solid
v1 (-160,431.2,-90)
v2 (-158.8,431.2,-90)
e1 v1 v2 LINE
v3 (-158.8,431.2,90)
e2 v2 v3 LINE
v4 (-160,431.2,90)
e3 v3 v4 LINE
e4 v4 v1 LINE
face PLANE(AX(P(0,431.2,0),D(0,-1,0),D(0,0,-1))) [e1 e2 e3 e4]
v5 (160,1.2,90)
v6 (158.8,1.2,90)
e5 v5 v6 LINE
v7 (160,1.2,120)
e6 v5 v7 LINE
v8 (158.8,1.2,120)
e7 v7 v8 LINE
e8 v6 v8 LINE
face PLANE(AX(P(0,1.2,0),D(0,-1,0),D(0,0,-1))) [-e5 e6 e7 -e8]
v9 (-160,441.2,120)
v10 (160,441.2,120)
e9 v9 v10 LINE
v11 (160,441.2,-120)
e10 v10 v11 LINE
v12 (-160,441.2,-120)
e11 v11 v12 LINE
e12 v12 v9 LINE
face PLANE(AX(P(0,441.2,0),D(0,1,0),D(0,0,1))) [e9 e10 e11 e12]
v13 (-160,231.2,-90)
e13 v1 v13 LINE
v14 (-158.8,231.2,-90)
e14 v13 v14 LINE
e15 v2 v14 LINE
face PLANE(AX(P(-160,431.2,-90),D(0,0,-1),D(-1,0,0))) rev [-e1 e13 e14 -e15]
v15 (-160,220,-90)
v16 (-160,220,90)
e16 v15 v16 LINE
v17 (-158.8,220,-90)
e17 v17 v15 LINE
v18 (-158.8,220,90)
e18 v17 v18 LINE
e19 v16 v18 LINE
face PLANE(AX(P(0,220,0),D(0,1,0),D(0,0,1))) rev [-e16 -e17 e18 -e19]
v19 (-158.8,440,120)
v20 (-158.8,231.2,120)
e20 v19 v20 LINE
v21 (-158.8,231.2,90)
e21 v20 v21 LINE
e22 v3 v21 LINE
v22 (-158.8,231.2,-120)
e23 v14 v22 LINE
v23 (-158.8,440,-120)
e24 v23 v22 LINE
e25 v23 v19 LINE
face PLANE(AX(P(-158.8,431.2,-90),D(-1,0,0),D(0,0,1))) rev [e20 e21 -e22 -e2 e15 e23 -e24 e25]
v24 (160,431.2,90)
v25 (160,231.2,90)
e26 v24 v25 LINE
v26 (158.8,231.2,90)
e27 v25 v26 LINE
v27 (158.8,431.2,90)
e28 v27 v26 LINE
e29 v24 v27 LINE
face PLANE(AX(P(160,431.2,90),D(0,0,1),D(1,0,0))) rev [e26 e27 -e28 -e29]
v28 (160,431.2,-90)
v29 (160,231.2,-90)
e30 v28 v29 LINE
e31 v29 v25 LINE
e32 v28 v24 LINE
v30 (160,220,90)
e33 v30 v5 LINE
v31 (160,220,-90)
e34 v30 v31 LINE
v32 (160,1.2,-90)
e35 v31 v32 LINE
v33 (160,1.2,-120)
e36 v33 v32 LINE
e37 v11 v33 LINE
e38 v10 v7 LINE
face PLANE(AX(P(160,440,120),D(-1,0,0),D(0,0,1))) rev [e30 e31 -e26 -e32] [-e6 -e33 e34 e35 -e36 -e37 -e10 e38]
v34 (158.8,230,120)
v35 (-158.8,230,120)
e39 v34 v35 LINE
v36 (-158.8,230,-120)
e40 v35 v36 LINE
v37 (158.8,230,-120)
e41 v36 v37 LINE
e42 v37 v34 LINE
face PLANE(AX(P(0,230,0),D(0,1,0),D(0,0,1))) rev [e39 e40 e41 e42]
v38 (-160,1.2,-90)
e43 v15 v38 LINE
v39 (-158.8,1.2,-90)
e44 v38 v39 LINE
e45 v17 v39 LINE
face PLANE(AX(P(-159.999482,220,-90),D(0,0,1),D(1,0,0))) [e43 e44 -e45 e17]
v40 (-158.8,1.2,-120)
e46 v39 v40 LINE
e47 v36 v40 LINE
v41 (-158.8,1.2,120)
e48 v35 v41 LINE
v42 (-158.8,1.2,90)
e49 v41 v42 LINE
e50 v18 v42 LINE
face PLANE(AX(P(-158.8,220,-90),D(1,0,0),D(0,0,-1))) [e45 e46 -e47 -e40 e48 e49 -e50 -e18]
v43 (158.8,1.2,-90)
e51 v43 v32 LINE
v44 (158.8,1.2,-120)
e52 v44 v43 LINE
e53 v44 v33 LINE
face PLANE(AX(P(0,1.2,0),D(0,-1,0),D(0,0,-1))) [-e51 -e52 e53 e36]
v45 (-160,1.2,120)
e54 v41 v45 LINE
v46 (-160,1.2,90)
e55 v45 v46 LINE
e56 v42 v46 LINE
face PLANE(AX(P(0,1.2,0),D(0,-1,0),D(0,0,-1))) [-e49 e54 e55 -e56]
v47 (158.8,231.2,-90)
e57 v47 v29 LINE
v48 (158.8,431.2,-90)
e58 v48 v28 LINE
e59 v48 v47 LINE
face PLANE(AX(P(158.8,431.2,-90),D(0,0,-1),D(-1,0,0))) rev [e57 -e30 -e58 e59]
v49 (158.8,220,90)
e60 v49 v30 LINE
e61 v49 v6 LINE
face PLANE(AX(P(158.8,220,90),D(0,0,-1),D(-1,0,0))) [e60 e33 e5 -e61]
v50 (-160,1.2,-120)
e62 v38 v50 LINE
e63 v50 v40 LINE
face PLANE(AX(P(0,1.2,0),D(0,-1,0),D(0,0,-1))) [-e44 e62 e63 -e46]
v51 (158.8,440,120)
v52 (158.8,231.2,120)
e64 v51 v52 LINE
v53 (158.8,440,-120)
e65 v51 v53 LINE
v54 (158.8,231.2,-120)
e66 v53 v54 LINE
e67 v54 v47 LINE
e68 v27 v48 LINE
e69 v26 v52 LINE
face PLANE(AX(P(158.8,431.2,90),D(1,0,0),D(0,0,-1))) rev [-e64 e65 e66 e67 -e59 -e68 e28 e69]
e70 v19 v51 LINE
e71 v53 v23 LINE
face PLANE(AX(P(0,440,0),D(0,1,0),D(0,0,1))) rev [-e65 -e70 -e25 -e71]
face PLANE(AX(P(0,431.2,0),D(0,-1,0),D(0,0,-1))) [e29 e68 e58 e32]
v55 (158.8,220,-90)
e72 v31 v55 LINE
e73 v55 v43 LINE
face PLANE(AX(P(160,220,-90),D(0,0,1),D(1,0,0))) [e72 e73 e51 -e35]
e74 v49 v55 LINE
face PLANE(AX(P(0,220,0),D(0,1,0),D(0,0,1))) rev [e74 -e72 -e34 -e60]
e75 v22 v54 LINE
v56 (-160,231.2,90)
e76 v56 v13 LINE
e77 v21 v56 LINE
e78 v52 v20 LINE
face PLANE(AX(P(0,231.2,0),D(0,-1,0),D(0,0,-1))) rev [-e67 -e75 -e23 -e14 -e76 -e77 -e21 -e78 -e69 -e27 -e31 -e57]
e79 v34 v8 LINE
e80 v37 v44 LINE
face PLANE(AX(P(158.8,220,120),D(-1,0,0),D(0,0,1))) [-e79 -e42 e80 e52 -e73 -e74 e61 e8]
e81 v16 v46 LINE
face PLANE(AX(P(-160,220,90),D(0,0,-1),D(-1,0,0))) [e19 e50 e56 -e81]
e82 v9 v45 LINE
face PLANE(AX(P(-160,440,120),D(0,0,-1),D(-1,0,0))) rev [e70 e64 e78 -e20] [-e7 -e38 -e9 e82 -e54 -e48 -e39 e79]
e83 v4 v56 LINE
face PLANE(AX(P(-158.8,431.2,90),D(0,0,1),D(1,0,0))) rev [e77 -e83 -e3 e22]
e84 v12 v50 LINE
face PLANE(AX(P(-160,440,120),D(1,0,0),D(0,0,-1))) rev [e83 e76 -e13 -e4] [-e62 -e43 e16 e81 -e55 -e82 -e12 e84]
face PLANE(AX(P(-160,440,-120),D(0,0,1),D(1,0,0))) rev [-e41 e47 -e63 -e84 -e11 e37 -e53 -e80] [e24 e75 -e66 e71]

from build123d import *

# Parameters (mm, degrees)
ESBO_O1_W                = 320
ESBO_O1_H                = 240
RESSALTO_EXTRUS_O1_DEPTH = 440
CORTE_EXTRUS_O1_DEPTH    = 220
SKETCH4_W                = 320
SKETCH4_H                = 240
BOSS_EXTRUDE2_DEPTH      = 1.2
CUT_EXTRUDE1_DEPTH       = 10
CUT_EXTRUDE2_DEPTH       = 200
SKETCH7_W                = 317.6
SKETCH7_H                = 240
CUT_EXTRUDE3_DEPTH       = 8.8
SKETCH9_W                = 338.812461563
SKETCH9_H                = 258.873896412
CUT_EXTRUDE4_DEPTH       = 1.2


# Read off the part's stored shape, not the designer's step: Corte-extrusão1
with BuildPart() as part:
    # Esboço1 → Ressalto-extrusão1 (new body)
    with BuildSketch(Plane(origin=(0, 0, 0), x_dir=(1, 0, 0), z_dir=(0, 1, 0))):
        Rectangle(ESBO_O1_W, ESBO_O1_H)
    extrude(amount=RESSALTO_EXTRUS_O1_DEPTH)

    # Corte-extrusão1 outline → Corte-extrusão1 (cut)
    with BuildSketch(Plane(origin=(0, 0, 0), x_dir=(1, 0, 0), z_dir=(0, 1, 0))):
        Polygon((158.8, -120), (158.8, -90), (160, -90), (160, 90), (158.8, 90), (158.8, 120), (-158.8, 120), (-158.8, 90), (-160, 90), (-160, -90), (-158.8, -90), (-158.8, -120), align=None)
    extrude(amount=CORTE_EXTRUS_O1_DEPTH, mode=Mode.SUBTRACT)

    # Sketch4 → Boss-Extrude2 (add)
    with BuildSketch(Plane(origin=(0, 440, 0), x_dir=(1, 0, 0), z_dir=(0, 1, 0))):
        Rectangle(SKETCH4_W, SKETCH4_H)
    extrude(amount=BOSS_EXTRUDE2_DEPTH)

    # Esboço5 → Cut-Extrude1 (cut)
    with BuildSketch(Plane.XZ.offset(-220)):
        Polygon((158.8, -90), (158.8, -120), (-158.8, -120), (-158.8, 120), (158.8, 120), align=None)
    extrude(amount=-CUT_EXTRUDE1_DEPTH, mode=Mode.SUBTRACT)

    # Sketch6 → Cut-Extrude2 (cut)
    with BuildSketch(Plane(origin=(0, 231.2, 0), x_dir=(-1, 0, 0), z_dir=(0, -1, 0))):
        Polygon((158.8, -120), (158.8, -90), (160, -90), (160, 90), (158.8, 90), (158.8, 120), (-158.8, 120), (-158.8, 90), (-160, 90), (-160, -90), (-158.8, -90), (-158.8, -120), align=None)
    extrude(amount=-CUT_EXTRUDE2_DEPTH, mode=Mode.SUBTRACT)

    # Sketch7 → Cut-Extrude3 (cut)
    with BuildSketch(Plane(origin=(0, 431.2, 0), x_dir=(-1, 0, 0), z_dir=(0, -1, 0))):
        Rectangle(SKETCH7_W, SKETCH7_H)
    extrude(amount=-CUT_EXTRUDE3_DEPTH, mode=Mode.SUBTRACT)

    # Sketch9 → Cut-Extrude4 (cut)
    with BuildSketch(Plane(origin=(0, 0, 0), x_dir=(-1, 0, 0), z_dir=(0, -1, 0))):
        with Locations((2.117577884, -1.826723931)):
            Rectangle(SKETCH9_W, SKETCH9_H)
    extrude(amount=-CUT_EXTRUDE4_DEPTH, mode=Mode.SUBTRACT)


solid = part.part
